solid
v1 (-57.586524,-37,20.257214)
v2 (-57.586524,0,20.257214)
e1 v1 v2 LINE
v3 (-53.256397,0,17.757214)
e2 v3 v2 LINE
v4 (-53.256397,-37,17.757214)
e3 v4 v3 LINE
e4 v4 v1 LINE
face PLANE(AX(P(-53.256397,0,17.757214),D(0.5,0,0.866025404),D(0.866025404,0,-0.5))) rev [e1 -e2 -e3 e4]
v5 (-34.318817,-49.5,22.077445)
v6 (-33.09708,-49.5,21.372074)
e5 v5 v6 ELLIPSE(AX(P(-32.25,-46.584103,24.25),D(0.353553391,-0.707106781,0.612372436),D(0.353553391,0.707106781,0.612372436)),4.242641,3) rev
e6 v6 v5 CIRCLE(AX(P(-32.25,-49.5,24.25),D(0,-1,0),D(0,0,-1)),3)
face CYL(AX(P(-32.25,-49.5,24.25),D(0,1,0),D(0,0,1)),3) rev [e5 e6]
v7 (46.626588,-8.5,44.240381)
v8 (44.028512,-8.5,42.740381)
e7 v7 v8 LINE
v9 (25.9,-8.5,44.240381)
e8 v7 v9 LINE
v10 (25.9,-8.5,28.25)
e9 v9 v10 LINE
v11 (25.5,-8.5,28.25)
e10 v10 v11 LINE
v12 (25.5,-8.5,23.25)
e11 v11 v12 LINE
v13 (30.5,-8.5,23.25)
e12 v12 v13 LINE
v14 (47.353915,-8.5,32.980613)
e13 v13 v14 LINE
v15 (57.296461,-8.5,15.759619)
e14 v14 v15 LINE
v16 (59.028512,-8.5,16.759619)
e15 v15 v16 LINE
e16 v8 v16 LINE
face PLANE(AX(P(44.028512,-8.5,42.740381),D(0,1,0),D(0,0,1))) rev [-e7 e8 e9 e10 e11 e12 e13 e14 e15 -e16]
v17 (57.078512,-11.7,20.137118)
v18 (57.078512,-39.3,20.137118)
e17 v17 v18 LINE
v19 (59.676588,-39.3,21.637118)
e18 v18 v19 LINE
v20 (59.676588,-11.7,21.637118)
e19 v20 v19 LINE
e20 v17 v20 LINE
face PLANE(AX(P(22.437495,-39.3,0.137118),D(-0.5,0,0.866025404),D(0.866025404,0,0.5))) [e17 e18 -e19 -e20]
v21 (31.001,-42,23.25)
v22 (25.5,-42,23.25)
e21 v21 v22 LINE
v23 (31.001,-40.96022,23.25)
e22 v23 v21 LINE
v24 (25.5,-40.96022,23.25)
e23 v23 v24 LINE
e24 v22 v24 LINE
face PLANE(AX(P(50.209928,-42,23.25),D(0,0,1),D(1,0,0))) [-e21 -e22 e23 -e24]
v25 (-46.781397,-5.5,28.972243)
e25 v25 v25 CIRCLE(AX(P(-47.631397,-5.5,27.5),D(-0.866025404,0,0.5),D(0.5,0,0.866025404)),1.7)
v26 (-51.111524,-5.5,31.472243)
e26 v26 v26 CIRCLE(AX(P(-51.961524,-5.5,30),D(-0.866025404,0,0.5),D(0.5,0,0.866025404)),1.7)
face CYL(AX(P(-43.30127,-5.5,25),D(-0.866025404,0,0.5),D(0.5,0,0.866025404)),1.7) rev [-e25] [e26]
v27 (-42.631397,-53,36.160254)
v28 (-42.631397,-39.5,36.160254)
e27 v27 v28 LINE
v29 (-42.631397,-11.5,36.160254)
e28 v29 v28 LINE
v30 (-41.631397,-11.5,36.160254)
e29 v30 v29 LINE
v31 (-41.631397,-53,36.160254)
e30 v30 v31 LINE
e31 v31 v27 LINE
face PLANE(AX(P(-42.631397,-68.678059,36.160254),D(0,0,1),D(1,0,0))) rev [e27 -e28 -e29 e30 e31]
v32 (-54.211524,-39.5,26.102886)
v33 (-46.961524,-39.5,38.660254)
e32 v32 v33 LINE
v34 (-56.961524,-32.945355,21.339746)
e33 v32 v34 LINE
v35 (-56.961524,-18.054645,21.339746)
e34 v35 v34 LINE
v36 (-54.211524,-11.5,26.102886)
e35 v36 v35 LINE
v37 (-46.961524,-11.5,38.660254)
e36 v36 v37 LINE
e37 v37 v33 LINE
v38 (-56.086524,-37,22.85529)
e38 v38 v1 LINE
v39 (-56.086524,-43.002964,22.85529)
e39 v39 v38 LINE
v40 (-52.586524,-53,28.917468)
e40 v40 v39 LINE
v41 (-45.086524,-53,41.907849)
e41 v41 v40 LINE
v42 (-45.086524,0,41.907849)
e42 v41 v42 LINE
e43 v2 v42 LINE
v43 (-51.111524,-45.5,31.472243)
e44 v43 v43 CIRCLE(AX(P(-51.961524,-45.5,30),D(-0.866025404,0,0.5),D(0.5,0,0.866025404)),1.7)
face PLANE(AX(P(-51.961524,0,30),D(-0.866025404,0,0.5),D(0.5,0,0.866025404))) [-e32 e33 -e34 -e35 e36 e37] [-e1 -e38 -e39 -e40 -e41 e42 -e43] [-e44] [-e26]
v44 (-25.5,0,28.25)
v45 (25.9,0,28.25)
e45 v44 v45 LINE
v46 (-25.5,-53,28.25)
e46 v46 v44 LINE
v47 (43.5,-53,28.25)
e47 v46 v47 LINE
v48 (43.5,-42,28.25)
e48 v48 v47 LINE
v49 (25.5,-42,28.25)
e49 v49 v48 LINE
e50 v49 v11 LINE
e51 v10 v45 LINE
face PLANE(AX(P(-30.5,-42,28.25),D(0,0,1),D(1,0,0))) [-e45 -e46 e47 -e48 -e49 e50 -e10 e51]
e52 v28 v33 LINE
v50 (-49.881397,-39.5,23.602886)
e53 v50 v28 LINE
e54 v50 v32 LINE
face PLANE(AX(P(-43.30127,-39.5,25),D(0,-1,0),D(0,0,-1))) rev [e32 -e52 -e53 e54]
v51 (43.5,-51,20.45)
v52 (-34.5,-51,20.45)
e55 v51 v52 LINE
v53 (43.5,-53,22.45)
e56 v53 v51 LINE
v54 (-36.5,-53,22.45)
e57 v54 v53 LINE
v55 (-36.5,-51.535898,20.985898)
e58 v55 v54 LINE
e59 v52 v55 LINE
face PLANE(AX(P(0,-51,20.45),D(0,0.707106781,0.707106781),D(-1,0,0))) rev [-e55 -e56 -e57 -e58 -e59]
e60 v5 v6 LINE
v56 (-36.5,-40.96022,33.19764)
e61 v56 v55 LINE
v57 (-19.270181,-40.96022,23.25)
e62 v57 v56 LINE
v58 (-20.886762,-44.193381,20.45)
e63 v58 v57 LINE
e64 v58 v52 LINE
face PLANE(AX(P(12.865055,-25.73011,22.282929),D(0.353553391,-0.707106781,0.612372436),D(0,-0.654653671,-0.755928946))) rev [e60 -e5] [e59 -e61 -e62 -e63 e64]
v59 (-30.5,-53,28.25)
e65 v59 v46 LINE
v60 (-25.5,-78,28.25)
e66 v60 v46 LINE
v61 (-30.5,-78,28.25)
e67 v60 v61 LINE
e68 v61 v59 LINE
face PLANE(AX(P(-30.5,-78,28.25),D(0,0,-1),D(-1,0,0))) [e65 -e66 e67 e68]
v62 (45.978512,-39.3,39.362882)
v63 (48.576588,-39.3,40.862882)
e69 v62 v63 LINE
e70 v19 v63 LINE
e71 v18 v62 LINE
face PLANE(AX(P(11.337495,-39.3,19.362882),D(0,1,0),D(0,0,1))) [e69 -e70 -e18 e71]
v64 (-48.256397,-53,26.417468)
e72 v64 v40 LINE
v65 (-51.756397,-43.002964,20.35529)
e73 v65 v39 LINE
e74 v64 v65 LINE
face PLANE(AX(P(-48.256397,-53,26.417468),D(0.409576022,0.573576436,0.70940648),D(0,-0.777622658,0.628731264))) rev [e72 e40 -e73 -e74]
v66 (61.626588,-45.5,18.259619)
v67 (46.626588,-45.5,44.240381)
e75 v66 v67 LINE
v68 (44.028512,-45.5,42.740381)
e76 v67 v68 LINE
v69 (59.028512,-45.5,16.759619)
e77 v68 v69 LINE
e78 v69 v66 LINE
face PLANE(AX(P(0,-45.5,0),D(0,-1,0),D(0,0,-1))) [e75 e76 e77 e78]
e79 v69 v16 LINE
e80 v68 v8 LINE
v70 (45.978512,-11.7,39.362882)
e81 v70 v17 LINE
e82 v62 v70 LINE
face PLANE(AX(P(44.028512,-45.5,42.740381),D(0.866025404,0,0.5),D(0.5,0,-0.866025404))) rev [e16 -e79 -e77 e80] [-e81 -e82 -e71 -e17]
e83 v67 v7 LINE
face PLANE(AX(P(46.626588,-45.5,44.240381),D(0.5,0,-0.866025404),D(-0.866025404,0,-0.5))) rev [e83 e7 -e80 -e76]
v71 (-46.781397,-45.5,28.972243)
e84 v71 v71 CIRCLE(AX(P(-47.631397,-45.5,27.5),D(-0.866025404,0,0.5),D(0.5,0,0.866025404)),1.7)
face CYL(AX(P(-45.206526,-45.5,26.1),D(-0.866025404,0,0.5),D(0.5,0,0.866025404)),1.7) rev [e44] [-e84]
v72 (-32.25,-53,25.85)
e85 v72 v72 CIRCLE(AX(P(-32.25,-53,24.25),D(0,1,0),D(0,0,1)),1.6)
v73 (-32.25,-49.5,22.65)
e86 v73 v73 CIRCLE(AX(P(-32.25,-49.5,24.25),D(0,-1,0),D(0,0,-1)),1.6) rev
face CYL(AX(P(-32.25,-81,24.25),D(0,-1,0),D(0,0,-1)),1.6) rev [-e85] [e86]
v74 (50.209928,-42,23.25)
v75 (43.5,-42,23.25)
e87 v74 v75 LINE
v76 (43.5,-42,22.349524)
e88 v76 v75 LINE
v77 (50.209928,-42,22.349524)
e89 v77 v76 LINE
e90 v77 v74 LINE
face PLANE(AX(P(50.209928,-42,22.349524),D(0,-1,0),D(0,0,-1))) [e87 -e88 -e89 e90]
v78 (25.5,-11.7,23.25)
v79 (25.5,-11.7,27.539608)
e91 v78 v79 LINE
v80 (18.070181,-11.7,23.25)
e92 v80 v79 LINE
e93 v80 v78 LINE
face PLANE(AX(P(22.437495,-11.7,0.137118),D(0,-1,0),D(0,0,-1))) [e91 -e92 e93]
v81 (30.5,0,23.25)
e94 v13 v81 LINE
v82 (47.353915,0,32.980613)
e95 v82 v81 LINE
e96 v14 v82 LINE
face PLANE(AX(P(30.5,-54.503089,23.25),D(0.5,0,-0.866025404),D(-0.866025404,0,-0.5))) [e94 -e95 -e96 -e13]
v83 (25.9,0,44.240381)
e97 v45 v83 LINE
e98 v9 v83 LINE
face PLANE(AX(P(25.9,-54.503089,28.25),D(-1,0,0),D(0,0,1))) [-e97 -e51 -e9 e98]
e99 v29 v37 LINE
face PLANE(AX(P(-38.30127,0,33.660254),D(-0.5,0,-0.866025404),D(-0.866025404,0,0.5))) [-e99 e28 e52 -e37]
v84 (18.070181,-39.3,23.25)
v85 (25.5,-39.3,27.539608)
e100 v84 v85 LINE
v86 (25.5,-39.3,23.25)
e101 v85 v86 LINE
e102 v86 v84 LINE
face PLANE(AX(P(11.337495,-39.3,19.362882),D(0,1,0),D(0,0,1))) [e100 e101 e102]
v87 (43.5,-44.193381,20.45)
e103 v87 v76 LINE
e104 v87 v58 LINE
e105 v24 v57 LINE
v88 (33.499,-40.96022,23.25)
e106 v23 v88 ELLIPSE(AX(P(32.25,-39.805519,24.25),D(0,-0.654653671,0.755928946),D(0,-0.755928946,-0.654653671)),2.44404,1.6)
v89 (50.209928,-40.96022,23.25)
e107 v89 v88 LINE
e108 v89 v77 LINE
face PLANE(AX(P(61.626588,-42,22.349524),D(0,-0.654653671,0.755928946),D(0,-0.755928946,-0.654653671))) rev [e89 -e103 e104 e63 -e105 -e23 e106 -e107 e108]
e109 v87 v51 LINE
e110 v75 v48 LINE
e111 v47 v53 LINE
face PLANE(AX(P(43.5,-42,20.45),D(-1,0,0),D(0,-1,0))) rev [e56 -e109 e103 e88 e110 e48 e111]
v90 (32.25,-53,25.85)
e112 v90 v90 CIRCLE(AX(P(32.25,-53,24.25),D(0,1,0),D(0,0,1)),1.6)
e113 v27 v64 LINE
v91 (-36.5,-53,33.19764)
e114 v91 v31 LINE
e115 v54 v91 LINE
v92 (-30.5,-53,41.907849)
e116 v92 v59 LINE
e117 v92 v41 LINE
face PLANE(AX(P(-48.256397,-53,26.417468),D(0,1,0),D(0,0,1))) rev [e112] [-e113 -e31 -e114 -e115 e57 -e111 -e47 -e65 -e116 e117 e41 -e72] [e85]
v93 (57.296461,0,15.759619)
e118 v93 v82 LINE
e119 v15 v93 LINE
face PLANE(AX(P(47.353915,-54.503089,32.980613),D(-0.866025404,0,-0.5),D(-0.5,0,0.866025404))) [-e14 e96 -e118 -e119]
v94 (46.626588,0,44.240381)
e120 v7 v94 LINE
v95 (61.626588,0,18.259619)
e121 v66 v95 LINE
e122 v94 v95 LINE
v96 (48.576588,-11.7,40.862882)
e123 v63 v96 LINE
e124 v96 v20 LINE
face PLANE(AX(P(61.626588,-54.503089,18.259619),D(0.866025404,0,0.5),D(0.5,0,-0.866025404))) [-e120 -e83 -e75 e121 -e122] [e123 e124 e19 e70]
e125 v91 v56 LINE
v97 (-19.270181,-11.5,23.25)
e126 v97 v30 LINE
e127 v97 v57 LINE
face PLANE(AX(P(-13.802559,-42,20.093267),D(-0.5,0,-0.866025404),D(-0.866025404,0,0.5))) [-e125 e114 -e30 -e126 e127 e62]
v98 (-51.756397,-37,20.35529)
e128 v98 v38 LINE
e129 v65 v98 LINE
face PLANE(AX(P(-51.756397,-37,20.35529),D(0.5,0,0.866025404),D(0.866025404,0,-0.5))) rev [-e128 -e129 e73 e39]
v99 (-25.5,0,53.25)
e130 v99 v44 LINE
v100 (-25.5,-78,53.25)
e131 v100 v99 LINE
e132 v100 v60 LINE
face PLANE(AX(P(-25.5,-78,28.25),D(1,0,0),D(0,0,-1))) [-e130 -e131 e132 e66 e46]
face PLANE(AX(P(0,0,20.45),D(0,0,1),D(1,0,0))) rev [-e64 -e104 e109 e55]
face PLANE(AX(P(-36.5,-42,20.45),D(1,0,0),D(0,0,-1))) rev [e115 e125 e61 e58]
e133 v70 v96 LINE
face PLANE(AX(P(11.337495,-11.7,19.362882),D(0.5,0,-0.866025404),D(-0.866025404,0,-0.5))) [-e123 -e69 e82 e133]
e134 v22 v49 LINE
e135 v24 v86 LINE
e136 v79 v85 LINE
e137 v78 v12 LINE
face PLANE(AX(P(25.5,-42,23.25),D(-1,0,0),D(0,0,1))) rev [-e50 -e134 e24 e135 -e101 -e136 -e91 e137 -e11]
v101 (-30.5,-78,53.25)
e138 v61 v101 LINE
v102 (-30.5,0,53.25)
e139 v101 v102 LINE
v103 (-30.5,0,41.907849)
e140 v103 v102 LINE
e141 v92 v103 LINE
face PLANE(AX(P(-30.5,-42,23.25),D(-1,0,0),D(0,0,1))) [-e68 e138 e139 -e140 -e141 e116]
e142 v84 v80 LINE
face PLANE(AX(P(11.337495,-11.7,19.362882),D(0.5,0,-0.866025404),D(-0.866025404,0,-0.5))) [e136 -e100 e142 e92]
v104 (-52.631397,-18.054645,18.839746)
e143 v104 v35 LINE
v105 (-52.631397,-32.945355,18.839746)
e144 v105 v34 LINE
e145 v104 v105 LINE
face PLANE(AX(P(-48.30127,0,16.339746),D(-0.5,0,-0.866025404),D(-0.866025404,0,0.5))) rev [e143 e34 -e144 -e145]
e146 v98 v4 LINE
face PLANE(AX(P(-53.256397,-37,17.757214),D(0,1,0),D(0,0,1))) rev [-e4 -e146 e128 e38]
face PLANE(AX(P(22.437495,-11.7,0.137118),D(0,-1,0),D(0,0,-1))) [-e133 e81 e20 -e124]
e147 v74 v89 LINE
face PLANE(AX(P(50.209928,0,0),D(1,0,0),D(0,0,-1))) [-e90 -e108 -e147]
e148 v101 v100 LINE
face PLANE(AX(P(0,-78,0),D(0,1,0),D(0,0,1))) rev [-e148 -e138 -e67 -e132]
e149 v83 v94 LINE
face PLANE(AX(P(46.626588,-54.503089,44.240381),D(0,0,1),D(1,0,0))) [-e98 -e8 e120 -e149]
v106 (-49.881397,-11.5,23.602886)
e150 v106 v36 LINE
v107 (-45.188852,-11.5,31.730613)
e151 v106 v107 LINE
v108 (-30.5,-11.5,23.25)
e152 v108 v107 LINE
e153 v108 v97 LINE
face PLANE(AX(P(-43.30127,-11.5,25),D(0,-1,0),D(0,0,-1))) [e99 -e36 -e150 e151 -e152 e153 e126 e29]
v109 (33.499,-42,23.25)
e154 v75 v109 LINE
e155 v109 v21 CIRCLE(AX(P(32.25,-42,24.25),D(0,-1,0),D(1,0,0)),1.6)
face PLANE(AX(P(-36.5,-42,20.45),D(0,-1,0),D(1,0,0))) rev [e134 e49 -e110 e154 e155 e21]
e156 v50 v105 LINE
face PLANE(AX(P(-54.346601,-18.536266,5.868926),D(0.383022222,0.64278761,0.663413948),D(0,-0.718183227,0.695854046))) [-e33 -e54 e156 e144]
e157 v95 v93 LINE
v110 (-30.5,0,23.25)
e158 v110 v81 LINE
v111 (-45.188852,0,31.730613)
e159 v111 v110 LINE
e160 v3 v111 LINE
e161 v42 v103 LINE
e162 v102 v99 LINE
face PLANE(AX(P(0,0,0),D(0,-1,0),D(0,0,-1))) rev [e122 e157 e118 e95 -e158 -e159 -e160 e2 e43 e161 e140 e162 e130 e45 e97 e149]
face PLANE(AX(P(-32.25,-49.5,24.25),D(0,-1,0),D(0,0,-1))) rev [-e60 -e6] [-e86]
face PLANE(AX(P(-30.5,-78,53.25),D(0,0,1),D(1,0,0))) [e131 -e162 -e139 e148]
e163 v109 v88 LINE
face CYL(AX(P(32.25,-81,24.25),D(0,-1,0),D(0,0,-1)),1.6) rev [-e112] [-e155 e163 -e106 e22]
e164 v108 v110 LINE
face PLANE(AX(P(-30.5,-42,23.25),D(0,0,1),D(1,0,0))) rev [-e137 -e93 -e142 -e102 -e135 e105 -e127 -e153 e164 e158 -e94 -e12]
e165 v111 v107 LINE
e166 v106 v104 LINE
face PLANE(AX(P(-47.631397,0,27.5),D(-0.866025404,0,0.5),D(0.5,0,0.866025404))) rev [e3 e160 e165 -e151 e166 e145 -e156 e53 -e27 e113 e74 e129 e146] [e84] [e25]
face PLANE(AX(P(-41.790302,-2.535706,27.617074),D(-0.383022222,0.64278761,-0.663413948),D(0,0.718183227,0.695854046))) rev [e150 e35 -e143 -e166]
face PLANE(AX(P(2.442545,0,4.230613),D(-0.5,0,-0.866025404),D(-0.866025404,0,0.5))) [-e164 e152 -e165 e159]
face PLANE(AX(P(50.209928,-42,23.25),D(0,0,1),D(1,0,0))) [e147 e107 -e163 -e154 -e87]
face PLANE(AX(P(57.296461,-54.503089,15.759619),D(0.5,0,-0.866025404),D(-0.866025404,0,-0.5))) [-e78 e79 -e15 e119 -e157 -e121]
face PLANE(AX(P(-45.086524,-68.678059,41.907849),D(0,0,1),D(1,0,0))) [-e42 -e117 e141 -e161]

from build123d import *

# Parameters (mm, degrees)
SKETCH1_W                    = 56
SKETCH1_H                    = 5
BOSS_EXTRUDE1_DEPTH          = 42
SKETCH2_W                    = 5
SKETCH2_H                    = 25
BOSS_EXTRUDE2_DEPTH          = 78
BOSS_EXTRUDE3_DEPTH          = 5
SKETCH5_W                    = 30
SKETCH5_H                    = 37
BOSS_EXTRUDE4_DEPTH          = 3
SKETCH9_W                    = 80
SKETCH9_H                    = 10
BOSS_EXTRUDE7_DEPTH          = 7.8
SKETCH6_R                    = 1.7
CUT_EXTRUDE1_DEPTH           = 10
SKETCH6_3_R                  = 1.7
CUT_EXTRUDE2_DEPTH           = 7.8
BOSS_EXTRUDE5_REACH          = 114.771
CUT_EXTRUDE3_START           = 3
CUT_EXTRUDE3_DEPTH           = 30
BOSS_EXTRUDE8_REACH          = 104.503
SKETCH12_W                   = 6
SKETCH12_H                   = 10
SKETCH14_W                   = 21.376587736
SKETCH14_H                   = 30
BOSS_EXTRUDE9_DEPTH          = 10
CUT_EXTRUDE4_DEPTH           = 113.771445038
SKETCH17_W                   = 20
SKETCH17_H                   = 15
CUT_EXTRUDE5_DEPTH           = 94.029704558
CUT_EXTRUDE6_DEPTH           = 126.411384609
BOSS_EXTRUDE11_DEPTH         = 70
CUT_EXTRUDE7_DEPTH           = 94.029704558
CUT_EXTRUDE8_DEPTH           = 97.630216889
BOSS_EXTRUDE12_DEPTH         = 1
M3_START                     = -53
M3_CLEARANCE_HOLE1_OUTLINE_R = 1.6
M3_CLEARANCE_HOLE1_DEPTH     = 12.039780493
BOSS_EXTRUDE13_REACH         = 111.463
SKETCH25_W                   = 15
SKETCH25_H                   = 40.960219507
BOSS_EXTRUDE14_DEPTH         = 12.039780493
SKETCH27_W                   = 18
SKETCH27_H                   = 11.5
BOSS_EXTRUDE15_DEPTH         = 5.614909
SKETCH28_R                   = 3
CUT_EXTRUDE9_DEPTH           = 38
CHAMFER4_SIZE                = 2
BOSS_EXTRUDE16_DEPTH         = 8.5
CUT_EXTRUDE10_DEPTH          = 108.068430529
BOSS_EXTRUDE17_DEPTH         = 37
CUT_EXTRUDE11_DEPTH          = 40
CUT_EXTRUDE11_DEPTH_BACK     = 137.170264842
SKETCH31_W                   = 22.2
SKETCH31_H                   = 27.6


# Read off the part's stored shape, not the designer's step: M3 Clearance Hole1
with BuildPart() as part:
    # Sketch1 → Boss-Extrude1 (new body)
    with BuildSketch(Plane(origin=(0, 0, 0), x_dir=(1, 0, 0), z_dir=(0, 1, 0))):
        with Locations((-2.5, -25.75)):
            Rectangle(SKETCH1_W, SKETCH1_H)
    extrude(amount=-BOSS_EXTRUDE1_DEPTH)

    # Sketch2 → Boss-Extrude2 (add)
    with BuildSketch(Plane(origin=(0, 0, 0), x_dir=(1, 0, 0), z_dir=(0, 1, 0))):
        with Locations((-28, -40.75)):
            Rectangle(SKETCH2_W, SKETCH2_H)
    extrude(amount=-BOSS_EXTRUDE2_DEPTH)

    # Sketch9 → Boss-Extrude7 (add)
    with BuildSketch(Plane(origin=(0, 0, 28.25), x_dir=(-1, 0, 0), z_dir=(0, 0, -1))):
        with Locations((-3.5, -47)):
            Rectangle(SKETCH9_W, SKETCH9_H)
    extrude(amount=BOSS_EXTRUDE7_DEPTH)


with BuildPart() as body_2:
    # Sketch4 → Boss-Extrude3 (new body)
    with BuildSketch(Plane(origin=(-51.961524227, 0, 30), x_dir=(-0.500000000000001, 0, -0.8660254037844382), z_dir=(0.866025403784438, 0, -0.5000000000000009))):
        Polygon((1.25, -53), (8.25, -43.002963953), (8.25, -37), (11.25, -37), (11.25, 0), (-13.75, 0), (-13.75, -53), align=None)
    extrude(amount=BOSS_EXTRUDE3_DEPTH)

    # Sketch6 → Cut-Extrude1 (cut)
    with BuildSketch(Plane(origin=(-51.961524227, 0, 30), x_dir=(0.5000000000000009, 0, 0.8660254037844383), z_dir=(-0.8660254037844382, 0, 0.5000000000000008))):
        Polygon((10, -11.5), (-4.5, -11.5), (-10, -18.054644759), (-10, -32.945355241), (-4.5, -39.5), (10, -39.5), align=None)
        with Locations((0, -5.5)):
            Circle(SKETCH6_R)
    extrude(amount=-CUT_EXTRUDE1_DEPTH, mode=Mode.SUBTRACT)

    # Sketch6<3> → Cut-Extrude2 (cut)
    with BuildSketch(Plane(origin=(-51.961524227, 0, 30), x_dir=(0.5000000000000009, 0, 0.8660254037844383), z_dir=(-0.8660254037844382, 0, 0.5000000000000008))):
        with Locations((0, -45.5)):
            Circle(SKETCH6_3_R)
    extrude(amount=-CUT_EXTRUDE2_DEPTH, mode=Mode.SUBTRACT)

    # Boss-Extrude5: up to this face of the body (flat: up to its plane)
    boss_extrude5_end = Plane(body_2.part.faces().sort_by_distance((-46.671460718, -53, 34.162658774))[0])
    # Sketch7 → Boss-Extrude5 (add, up to the picked face)
    with BuildSketch(Plane(origin=(0, 0, 0), x_dir=(1, 0, 0), z_dir=(0, 1, 0)), mode=Mode.PRIVATE) as boss_extrude5_sk1:
        Polygon((-45.086524227, -41.907849302), (-30.5, -41.907849302), (-30.5, -36.160254038), (-42.631397208, -36.160254038), (-40.756397208, -39.407849302), align=None)
    boss_extrude5_tool1 = split(extrude(boss_extrude5_sk1.sketch, amount=-BOSS_EXTRUDE5_REACH, mode=Mode.PRIVATE), bisect_by=boss_extrude5_end, keep=Keep.BOTH, mode=Mode.PRIVATE)

    add(part.part)  # Boss-Extrude5 merges part
    add(boss_extrude5_tool1.solids().sort_by(Axis((-36.415744, 0, 39.11699), (0, -1, 0)))[0])

    # Sketch11 → Cut-Extrude3 (cut)
    with BuildSketch(Plane(origin=(-47.631397208, 0, 27.5), x_dir=(-0.5000000000000007, 0, -0.8660254037844384), z_dir=(0.8660254037844383, 0, -0.5000000000000006)).offset(CUT_EXTRUDE3_START)):
        Polygon((4.5, -42), (4.5, -39.5), (10, -32.945355241), (10, -18.054644759), (4.5, -11.5), (-10.5, -11.5), (-10.5, -42), align=None)
    extrude(amount=CUT_EXTRUDE3_DEPTH, mode=Mode.SUBTRACT)

    # Sketch12 → Boss-Extrude8 (add, up to next)
    with BuildSketch(Plane.XY.offset(28.25), mode=Mode.PRIVATE) as boss_extrude8_sk1:
        with Locations((-33.5, -47)):
            Rectangle(SKETCH12_W, SKETCH12_H)
    boss_extrude8_tool1 = extrude(boss_extrude8_sk1.sketch, amount=BOSS_EXTRUDE8_REACH, mode=Mode.PRIVATE) - body_2.part
    add(boss_extrude8_tool1.solids().sort_by_distance((-33.5, -47, 28.25))[0])

    # Sketch14 → Boss-Extrude9 (add)
    with BuildSketch(Plane(origin=(12.865054877, -25.730109754, 22.282928689), x_dir=(0.8660254037844385, 0, -0.5000000000000004), z_dir=(0.3535533905932723, -0.7071067811865512, 0.6123724356957913))):
        with Locations((-39.001760389, -22.151235068)):
            Rectangle(SKETCH14_W, SKETCH14_H)
    extrude(amount=BOSS_EXTRUDE9_DEPTH)

    # Sketch15 → Cut-Extrude4 (cut, through all)
    with BuildSketch(Plane(origin=(0, 0, 0), x_dir=(1, 0, 0), z_dir=(0, 1, 0))):
        Polygon((-36.5, -36.160254038), (-36.5, -20.45), (-43.302739548, -24.377563509), align=None)
        Polygon((-36.5, -20.45), (-20.88676203, -20.45), (-24.790071522, -13.689269641), align=None)
        Polygon((-16.38342993, -28.25), (-25.5, -28.25), (-25.5, -46.759010276), (-10.647935899, -38.184167069), align=None)
        Polygon((-30.5, -41.907849302), (-33.181624327, -41.907849302), (-30.5, -46.552558883), align=None)
    extrude(amount=-CUT_EXTRUDE4_DEPTH, mode=Mode.SUBTRACT)

    # Sketch17 → Cut-Extrude5 (cut, through all)
    with BuildSketch(Plane(origin=(12.865054877, -25.730109754, 22.282928689), x_dir=(0.8660254037844385, 0, -0.5000000000000004), z_dir=(0.3535533905932723, -0.7071067811865512, 0.6123724356957913))):
        with Locations((-38.313466521, -30.509099445)):
            Rectangle(SKETCH17_W, SKETCH17_H)
    extrude(amount=-CUT_EXTRUDE5_DEPTH, mode=Mode.SUBTRACT)

    # Sketch18 → Cut-Extrude6 (cut, through all)
    with BuildSketch(Plane.ZY.offset(20.88676203)):
        Polygon((20.45, -42), (22.349523679, -42), (20.45, -44.193381015), align=None)
    extrude(amount=-CUT_EXTRUDE6_DEPTH, mode=Mode.SUBTRACT)

    # Sketch20 → Boss-Extrude11 (add)
    with BuildSketch(Plane.ZY.offset(19.790071522)):
        Polygon((23.25, -40.960219507), (22.349523679, -42), (23.25, -42), align=None)
    extrude(amount=-BOSS_EXTRUDE11_DEPTH)

    # Sketch21 → Cut-Extrude7 (cut, through all)
    with BuildSketch(Plane(origin=(12.865054877, -25.730109754, 22.282928689), x_dir=(0.935414346693486, 0.2672612419124244, -0.23145502494313555), z_dir=(-0.35355339059327223, 0.7071067811865507, -0.6123724356957918))):
        Polygon((-34.354012493, 9.239410059), (-34.909798545, 10.600802291), (-37.243131878, 10.600802291), (-36.354012493, 8.422913478), align=None)
    extrude(amount=CUT_EXTRUDE7_DEPTH, mode=Mode.SUBTRACT)

    # Sketch22 → Cut-Extrude8 (cut, through all)
    with BuildSketch(Plane.XZ.offset(52)):
        Polygon((-30.5, 28.25), (-30.5, 36.160254038), (-36.565698604, 36.160254038), (-36.5, 20.45), (-16.5, 20.45), (-16.5, 28.25), align=None)
    extrude(amount=CUT_EXTRUDE8_DEPTH, mode=Mode.SUBTRACT)

    # Sketch24 → Boss-Extrude12 (add)
    with BuildSketch(Plane.XZ.offset(52)):
        Polygon((-30.5, 36.160254038), (-36.5, 36.160254038), (-36.5, 20.45), (43.5, 20.45), (43.5, 28.25), (-25.5, 28.25), (-30.5, 28.25), align=None)
    extrude(amount=BOSS_EXTRUDE12_DEPTH)

    # M3 Clearance Hole1 outline → M3 Clearance Hole1 (cut)
    with BuildSketch(Plane(origin=(0, 0, 0), x_dir=(1, 0, 0), z_dir=(0, 1, 0)).offset(M3_START)):
        with Locations((-32.25, -24.25)):
            Circle(M3_CLEARANCE_HOLE1_OUTLINE_R)
        with Locations((32.25, -24.25)):
            Circle(M3_CLEARANCE_HOLE1_OUTLINE_R)
    extrude(amount=M3_CLEARANCE_HOLE1_DEPTH, mode=Mode.SUBTRACT)

    # Boss-Extrude13: up to this face of the body (flat: up to its plane)
    boss_extrude13_end = Plane(body_2.part.faces().sort_by_distance((-37.124420642, -23.2412407, 36.160254038))[0])
    # Sketch25 → Boss-Extrude13 (add, up to the picked face)
    with BuildSketch(Plane(origin=(5.25, 0, 9.09326674), x_dir=(-0.8660254037844383, 0, 0.5000000000000008), z_dir=(-0.5000000000000007, 0, -0.8660254037844382)), mode=Mode.PRIVATE) as boss_extrude13_sk1:
        with Locations((48.780544247, -20.480109754)):
            Rectangle(SKETCH25_W, SKETCH25_H)
    boss_extrude13_tool1 = split(extrude(boss_extrude13_sk1.sketch, amount=-BOSS_EXTRUDE13_REACH, mode=Mode.PRIVATE), bisect_by=boss_extrude13_end, keep=Keep.BOTH, mode=Mode.PRIVATE)
    add(boss_extrude13_tool1.solids().sort_by(Axis((-36.995191, -20.48011, 33.483539), (0.5000000000000007, 0, 0.8660254037844382)))[0])

    # Sketch26 → Boss-Extrude14 (add)
    with BuildSketch(Plane.XZ.offset(40.960219507)):
        Polygon((-36.5, 33.197640478), (-36.5, 36.160254038), (-41.631397208, 36.160254038), align=None)
    extrude(amount=BOSS_EXTRUDE14_DEPTH)

    # Sketch27 → Boss-Extrude15 (add)
    with BuildSketch(Plane(origin=(5.25, 0, 9.09326674), x_dir=(-0.8660254037844383, 0, 0.5000000000000008), z_dir=(-0.5000000000000007, 0, -0.8660254037844382))):
        with Locations((47.038774815, -5.75)):
            Rectangle(SKETCH27_W, SKETCH27_H)
    extrude(amount=BOSS_EXTRUDE15_DEPTH)

    # Sketch28 → Cut-Extrude9 (cut)
    with BuildSketch(Plane.XZ.offset(11.5)):
        with Locations((-32.25, 24.25)):
            Circle(SKETCH28_R)
    extrude(amount=CUT_EXTRUDE9_DEPTH, mode=Mode.SUBTRACT)

    # Chamfer4
    chamfer4_edges = [body_2.edges().sort_by_distance(p)[0] for p in [
        (3.5, -53, 20.45),
    ]]
    chamfer(chamfer4_edges, length=CHAMFER4_SIZE)

    # Sketch29 → Boss-Extrude16 (add)
    with BuildSketch(Plane(origin=(0, 0, 0), x_dir=(1, 0, 0), z_dir=(0, 1, 0))):
        Polygon((25.5, -23.25), (30.5, -23.25), (47.353915399, -32.980612592), (57.296460718, -15.759618943), (61.626587737, -18.259618943), (46.626587737, -44.240381057), (25.9, -44.240381057), (25.9, -28.25), (25.5, -28.25), align=None)
    extrude(amount=-BOSS_EXTRUDE16_DEPTH)

    # Sketch30<2> → Boss-Extrude17 (add)
    with BuildSketch(Plane.XZ.offset(8.5)):
        Polygon((46.626587737, 44.240381057), (44.028511525, 42.740381057), (59.028511525, 16.759618943), (61.626587737, 18.259618943), align=None)
    extrude(amount=BOSS_EXTRUDE17_DEPTH)

    # Sketch31 → Cut-Extrude11 (cut, two sides: drawn at the far end of the back side and taken through both)
    with BuildSketch(Plane(origin=(51.528511525, 0, 29.75), x_dir=(-0.5000000000000012, 0, 0.866025403784438), z_dir=(-0.8660254037844379, 0, -0.5000000000000011)).offset(-CUT_EXTRUDE11_DEPTH_BACK)):
        with Locations((0, -25.5)):
            Rectangle(SKETCH31_W, SKETCH31_H)
    extrude(amount=CUT_EXTRUDE11_DEPTH + CUT_EXTRUDE11_DEPTH_BACK, mode=Mode.SUBTRACT)


with BuildPart() as body_3:
    # Sketch5 → Boss-Extrude4 (new body)
    with BuildSketch(Plane(origin=(54.126587737, 0, 31.25), x_dir=(0.5000000000000011, 0, -0.866025403784438), z_dir=(0.866025403784438, 0, 0.5000000000000011))):
        with Locations((0, -27)):
            Rectangle(SKETCH5_W, SKETCH5_H)
    extrude(amount=-BOSS_EXTRUDE4_DEPTH)

    # Sketch30 → Cut-Extrude10 (cut, through all)
    with BuildSketch(Plane.XZ.offset(8.5)):
        Polygon((46.626587737, 44.240381057), (44.028511525, 42.740381057), (59.028511525, 16.759618943), (61.626587737, 18.259618943), align=None)
    extrude(amount=CUT_EXTRUDE10_DEPTH, mode=Mode.SUBTRACT)


solid = body_2.part
